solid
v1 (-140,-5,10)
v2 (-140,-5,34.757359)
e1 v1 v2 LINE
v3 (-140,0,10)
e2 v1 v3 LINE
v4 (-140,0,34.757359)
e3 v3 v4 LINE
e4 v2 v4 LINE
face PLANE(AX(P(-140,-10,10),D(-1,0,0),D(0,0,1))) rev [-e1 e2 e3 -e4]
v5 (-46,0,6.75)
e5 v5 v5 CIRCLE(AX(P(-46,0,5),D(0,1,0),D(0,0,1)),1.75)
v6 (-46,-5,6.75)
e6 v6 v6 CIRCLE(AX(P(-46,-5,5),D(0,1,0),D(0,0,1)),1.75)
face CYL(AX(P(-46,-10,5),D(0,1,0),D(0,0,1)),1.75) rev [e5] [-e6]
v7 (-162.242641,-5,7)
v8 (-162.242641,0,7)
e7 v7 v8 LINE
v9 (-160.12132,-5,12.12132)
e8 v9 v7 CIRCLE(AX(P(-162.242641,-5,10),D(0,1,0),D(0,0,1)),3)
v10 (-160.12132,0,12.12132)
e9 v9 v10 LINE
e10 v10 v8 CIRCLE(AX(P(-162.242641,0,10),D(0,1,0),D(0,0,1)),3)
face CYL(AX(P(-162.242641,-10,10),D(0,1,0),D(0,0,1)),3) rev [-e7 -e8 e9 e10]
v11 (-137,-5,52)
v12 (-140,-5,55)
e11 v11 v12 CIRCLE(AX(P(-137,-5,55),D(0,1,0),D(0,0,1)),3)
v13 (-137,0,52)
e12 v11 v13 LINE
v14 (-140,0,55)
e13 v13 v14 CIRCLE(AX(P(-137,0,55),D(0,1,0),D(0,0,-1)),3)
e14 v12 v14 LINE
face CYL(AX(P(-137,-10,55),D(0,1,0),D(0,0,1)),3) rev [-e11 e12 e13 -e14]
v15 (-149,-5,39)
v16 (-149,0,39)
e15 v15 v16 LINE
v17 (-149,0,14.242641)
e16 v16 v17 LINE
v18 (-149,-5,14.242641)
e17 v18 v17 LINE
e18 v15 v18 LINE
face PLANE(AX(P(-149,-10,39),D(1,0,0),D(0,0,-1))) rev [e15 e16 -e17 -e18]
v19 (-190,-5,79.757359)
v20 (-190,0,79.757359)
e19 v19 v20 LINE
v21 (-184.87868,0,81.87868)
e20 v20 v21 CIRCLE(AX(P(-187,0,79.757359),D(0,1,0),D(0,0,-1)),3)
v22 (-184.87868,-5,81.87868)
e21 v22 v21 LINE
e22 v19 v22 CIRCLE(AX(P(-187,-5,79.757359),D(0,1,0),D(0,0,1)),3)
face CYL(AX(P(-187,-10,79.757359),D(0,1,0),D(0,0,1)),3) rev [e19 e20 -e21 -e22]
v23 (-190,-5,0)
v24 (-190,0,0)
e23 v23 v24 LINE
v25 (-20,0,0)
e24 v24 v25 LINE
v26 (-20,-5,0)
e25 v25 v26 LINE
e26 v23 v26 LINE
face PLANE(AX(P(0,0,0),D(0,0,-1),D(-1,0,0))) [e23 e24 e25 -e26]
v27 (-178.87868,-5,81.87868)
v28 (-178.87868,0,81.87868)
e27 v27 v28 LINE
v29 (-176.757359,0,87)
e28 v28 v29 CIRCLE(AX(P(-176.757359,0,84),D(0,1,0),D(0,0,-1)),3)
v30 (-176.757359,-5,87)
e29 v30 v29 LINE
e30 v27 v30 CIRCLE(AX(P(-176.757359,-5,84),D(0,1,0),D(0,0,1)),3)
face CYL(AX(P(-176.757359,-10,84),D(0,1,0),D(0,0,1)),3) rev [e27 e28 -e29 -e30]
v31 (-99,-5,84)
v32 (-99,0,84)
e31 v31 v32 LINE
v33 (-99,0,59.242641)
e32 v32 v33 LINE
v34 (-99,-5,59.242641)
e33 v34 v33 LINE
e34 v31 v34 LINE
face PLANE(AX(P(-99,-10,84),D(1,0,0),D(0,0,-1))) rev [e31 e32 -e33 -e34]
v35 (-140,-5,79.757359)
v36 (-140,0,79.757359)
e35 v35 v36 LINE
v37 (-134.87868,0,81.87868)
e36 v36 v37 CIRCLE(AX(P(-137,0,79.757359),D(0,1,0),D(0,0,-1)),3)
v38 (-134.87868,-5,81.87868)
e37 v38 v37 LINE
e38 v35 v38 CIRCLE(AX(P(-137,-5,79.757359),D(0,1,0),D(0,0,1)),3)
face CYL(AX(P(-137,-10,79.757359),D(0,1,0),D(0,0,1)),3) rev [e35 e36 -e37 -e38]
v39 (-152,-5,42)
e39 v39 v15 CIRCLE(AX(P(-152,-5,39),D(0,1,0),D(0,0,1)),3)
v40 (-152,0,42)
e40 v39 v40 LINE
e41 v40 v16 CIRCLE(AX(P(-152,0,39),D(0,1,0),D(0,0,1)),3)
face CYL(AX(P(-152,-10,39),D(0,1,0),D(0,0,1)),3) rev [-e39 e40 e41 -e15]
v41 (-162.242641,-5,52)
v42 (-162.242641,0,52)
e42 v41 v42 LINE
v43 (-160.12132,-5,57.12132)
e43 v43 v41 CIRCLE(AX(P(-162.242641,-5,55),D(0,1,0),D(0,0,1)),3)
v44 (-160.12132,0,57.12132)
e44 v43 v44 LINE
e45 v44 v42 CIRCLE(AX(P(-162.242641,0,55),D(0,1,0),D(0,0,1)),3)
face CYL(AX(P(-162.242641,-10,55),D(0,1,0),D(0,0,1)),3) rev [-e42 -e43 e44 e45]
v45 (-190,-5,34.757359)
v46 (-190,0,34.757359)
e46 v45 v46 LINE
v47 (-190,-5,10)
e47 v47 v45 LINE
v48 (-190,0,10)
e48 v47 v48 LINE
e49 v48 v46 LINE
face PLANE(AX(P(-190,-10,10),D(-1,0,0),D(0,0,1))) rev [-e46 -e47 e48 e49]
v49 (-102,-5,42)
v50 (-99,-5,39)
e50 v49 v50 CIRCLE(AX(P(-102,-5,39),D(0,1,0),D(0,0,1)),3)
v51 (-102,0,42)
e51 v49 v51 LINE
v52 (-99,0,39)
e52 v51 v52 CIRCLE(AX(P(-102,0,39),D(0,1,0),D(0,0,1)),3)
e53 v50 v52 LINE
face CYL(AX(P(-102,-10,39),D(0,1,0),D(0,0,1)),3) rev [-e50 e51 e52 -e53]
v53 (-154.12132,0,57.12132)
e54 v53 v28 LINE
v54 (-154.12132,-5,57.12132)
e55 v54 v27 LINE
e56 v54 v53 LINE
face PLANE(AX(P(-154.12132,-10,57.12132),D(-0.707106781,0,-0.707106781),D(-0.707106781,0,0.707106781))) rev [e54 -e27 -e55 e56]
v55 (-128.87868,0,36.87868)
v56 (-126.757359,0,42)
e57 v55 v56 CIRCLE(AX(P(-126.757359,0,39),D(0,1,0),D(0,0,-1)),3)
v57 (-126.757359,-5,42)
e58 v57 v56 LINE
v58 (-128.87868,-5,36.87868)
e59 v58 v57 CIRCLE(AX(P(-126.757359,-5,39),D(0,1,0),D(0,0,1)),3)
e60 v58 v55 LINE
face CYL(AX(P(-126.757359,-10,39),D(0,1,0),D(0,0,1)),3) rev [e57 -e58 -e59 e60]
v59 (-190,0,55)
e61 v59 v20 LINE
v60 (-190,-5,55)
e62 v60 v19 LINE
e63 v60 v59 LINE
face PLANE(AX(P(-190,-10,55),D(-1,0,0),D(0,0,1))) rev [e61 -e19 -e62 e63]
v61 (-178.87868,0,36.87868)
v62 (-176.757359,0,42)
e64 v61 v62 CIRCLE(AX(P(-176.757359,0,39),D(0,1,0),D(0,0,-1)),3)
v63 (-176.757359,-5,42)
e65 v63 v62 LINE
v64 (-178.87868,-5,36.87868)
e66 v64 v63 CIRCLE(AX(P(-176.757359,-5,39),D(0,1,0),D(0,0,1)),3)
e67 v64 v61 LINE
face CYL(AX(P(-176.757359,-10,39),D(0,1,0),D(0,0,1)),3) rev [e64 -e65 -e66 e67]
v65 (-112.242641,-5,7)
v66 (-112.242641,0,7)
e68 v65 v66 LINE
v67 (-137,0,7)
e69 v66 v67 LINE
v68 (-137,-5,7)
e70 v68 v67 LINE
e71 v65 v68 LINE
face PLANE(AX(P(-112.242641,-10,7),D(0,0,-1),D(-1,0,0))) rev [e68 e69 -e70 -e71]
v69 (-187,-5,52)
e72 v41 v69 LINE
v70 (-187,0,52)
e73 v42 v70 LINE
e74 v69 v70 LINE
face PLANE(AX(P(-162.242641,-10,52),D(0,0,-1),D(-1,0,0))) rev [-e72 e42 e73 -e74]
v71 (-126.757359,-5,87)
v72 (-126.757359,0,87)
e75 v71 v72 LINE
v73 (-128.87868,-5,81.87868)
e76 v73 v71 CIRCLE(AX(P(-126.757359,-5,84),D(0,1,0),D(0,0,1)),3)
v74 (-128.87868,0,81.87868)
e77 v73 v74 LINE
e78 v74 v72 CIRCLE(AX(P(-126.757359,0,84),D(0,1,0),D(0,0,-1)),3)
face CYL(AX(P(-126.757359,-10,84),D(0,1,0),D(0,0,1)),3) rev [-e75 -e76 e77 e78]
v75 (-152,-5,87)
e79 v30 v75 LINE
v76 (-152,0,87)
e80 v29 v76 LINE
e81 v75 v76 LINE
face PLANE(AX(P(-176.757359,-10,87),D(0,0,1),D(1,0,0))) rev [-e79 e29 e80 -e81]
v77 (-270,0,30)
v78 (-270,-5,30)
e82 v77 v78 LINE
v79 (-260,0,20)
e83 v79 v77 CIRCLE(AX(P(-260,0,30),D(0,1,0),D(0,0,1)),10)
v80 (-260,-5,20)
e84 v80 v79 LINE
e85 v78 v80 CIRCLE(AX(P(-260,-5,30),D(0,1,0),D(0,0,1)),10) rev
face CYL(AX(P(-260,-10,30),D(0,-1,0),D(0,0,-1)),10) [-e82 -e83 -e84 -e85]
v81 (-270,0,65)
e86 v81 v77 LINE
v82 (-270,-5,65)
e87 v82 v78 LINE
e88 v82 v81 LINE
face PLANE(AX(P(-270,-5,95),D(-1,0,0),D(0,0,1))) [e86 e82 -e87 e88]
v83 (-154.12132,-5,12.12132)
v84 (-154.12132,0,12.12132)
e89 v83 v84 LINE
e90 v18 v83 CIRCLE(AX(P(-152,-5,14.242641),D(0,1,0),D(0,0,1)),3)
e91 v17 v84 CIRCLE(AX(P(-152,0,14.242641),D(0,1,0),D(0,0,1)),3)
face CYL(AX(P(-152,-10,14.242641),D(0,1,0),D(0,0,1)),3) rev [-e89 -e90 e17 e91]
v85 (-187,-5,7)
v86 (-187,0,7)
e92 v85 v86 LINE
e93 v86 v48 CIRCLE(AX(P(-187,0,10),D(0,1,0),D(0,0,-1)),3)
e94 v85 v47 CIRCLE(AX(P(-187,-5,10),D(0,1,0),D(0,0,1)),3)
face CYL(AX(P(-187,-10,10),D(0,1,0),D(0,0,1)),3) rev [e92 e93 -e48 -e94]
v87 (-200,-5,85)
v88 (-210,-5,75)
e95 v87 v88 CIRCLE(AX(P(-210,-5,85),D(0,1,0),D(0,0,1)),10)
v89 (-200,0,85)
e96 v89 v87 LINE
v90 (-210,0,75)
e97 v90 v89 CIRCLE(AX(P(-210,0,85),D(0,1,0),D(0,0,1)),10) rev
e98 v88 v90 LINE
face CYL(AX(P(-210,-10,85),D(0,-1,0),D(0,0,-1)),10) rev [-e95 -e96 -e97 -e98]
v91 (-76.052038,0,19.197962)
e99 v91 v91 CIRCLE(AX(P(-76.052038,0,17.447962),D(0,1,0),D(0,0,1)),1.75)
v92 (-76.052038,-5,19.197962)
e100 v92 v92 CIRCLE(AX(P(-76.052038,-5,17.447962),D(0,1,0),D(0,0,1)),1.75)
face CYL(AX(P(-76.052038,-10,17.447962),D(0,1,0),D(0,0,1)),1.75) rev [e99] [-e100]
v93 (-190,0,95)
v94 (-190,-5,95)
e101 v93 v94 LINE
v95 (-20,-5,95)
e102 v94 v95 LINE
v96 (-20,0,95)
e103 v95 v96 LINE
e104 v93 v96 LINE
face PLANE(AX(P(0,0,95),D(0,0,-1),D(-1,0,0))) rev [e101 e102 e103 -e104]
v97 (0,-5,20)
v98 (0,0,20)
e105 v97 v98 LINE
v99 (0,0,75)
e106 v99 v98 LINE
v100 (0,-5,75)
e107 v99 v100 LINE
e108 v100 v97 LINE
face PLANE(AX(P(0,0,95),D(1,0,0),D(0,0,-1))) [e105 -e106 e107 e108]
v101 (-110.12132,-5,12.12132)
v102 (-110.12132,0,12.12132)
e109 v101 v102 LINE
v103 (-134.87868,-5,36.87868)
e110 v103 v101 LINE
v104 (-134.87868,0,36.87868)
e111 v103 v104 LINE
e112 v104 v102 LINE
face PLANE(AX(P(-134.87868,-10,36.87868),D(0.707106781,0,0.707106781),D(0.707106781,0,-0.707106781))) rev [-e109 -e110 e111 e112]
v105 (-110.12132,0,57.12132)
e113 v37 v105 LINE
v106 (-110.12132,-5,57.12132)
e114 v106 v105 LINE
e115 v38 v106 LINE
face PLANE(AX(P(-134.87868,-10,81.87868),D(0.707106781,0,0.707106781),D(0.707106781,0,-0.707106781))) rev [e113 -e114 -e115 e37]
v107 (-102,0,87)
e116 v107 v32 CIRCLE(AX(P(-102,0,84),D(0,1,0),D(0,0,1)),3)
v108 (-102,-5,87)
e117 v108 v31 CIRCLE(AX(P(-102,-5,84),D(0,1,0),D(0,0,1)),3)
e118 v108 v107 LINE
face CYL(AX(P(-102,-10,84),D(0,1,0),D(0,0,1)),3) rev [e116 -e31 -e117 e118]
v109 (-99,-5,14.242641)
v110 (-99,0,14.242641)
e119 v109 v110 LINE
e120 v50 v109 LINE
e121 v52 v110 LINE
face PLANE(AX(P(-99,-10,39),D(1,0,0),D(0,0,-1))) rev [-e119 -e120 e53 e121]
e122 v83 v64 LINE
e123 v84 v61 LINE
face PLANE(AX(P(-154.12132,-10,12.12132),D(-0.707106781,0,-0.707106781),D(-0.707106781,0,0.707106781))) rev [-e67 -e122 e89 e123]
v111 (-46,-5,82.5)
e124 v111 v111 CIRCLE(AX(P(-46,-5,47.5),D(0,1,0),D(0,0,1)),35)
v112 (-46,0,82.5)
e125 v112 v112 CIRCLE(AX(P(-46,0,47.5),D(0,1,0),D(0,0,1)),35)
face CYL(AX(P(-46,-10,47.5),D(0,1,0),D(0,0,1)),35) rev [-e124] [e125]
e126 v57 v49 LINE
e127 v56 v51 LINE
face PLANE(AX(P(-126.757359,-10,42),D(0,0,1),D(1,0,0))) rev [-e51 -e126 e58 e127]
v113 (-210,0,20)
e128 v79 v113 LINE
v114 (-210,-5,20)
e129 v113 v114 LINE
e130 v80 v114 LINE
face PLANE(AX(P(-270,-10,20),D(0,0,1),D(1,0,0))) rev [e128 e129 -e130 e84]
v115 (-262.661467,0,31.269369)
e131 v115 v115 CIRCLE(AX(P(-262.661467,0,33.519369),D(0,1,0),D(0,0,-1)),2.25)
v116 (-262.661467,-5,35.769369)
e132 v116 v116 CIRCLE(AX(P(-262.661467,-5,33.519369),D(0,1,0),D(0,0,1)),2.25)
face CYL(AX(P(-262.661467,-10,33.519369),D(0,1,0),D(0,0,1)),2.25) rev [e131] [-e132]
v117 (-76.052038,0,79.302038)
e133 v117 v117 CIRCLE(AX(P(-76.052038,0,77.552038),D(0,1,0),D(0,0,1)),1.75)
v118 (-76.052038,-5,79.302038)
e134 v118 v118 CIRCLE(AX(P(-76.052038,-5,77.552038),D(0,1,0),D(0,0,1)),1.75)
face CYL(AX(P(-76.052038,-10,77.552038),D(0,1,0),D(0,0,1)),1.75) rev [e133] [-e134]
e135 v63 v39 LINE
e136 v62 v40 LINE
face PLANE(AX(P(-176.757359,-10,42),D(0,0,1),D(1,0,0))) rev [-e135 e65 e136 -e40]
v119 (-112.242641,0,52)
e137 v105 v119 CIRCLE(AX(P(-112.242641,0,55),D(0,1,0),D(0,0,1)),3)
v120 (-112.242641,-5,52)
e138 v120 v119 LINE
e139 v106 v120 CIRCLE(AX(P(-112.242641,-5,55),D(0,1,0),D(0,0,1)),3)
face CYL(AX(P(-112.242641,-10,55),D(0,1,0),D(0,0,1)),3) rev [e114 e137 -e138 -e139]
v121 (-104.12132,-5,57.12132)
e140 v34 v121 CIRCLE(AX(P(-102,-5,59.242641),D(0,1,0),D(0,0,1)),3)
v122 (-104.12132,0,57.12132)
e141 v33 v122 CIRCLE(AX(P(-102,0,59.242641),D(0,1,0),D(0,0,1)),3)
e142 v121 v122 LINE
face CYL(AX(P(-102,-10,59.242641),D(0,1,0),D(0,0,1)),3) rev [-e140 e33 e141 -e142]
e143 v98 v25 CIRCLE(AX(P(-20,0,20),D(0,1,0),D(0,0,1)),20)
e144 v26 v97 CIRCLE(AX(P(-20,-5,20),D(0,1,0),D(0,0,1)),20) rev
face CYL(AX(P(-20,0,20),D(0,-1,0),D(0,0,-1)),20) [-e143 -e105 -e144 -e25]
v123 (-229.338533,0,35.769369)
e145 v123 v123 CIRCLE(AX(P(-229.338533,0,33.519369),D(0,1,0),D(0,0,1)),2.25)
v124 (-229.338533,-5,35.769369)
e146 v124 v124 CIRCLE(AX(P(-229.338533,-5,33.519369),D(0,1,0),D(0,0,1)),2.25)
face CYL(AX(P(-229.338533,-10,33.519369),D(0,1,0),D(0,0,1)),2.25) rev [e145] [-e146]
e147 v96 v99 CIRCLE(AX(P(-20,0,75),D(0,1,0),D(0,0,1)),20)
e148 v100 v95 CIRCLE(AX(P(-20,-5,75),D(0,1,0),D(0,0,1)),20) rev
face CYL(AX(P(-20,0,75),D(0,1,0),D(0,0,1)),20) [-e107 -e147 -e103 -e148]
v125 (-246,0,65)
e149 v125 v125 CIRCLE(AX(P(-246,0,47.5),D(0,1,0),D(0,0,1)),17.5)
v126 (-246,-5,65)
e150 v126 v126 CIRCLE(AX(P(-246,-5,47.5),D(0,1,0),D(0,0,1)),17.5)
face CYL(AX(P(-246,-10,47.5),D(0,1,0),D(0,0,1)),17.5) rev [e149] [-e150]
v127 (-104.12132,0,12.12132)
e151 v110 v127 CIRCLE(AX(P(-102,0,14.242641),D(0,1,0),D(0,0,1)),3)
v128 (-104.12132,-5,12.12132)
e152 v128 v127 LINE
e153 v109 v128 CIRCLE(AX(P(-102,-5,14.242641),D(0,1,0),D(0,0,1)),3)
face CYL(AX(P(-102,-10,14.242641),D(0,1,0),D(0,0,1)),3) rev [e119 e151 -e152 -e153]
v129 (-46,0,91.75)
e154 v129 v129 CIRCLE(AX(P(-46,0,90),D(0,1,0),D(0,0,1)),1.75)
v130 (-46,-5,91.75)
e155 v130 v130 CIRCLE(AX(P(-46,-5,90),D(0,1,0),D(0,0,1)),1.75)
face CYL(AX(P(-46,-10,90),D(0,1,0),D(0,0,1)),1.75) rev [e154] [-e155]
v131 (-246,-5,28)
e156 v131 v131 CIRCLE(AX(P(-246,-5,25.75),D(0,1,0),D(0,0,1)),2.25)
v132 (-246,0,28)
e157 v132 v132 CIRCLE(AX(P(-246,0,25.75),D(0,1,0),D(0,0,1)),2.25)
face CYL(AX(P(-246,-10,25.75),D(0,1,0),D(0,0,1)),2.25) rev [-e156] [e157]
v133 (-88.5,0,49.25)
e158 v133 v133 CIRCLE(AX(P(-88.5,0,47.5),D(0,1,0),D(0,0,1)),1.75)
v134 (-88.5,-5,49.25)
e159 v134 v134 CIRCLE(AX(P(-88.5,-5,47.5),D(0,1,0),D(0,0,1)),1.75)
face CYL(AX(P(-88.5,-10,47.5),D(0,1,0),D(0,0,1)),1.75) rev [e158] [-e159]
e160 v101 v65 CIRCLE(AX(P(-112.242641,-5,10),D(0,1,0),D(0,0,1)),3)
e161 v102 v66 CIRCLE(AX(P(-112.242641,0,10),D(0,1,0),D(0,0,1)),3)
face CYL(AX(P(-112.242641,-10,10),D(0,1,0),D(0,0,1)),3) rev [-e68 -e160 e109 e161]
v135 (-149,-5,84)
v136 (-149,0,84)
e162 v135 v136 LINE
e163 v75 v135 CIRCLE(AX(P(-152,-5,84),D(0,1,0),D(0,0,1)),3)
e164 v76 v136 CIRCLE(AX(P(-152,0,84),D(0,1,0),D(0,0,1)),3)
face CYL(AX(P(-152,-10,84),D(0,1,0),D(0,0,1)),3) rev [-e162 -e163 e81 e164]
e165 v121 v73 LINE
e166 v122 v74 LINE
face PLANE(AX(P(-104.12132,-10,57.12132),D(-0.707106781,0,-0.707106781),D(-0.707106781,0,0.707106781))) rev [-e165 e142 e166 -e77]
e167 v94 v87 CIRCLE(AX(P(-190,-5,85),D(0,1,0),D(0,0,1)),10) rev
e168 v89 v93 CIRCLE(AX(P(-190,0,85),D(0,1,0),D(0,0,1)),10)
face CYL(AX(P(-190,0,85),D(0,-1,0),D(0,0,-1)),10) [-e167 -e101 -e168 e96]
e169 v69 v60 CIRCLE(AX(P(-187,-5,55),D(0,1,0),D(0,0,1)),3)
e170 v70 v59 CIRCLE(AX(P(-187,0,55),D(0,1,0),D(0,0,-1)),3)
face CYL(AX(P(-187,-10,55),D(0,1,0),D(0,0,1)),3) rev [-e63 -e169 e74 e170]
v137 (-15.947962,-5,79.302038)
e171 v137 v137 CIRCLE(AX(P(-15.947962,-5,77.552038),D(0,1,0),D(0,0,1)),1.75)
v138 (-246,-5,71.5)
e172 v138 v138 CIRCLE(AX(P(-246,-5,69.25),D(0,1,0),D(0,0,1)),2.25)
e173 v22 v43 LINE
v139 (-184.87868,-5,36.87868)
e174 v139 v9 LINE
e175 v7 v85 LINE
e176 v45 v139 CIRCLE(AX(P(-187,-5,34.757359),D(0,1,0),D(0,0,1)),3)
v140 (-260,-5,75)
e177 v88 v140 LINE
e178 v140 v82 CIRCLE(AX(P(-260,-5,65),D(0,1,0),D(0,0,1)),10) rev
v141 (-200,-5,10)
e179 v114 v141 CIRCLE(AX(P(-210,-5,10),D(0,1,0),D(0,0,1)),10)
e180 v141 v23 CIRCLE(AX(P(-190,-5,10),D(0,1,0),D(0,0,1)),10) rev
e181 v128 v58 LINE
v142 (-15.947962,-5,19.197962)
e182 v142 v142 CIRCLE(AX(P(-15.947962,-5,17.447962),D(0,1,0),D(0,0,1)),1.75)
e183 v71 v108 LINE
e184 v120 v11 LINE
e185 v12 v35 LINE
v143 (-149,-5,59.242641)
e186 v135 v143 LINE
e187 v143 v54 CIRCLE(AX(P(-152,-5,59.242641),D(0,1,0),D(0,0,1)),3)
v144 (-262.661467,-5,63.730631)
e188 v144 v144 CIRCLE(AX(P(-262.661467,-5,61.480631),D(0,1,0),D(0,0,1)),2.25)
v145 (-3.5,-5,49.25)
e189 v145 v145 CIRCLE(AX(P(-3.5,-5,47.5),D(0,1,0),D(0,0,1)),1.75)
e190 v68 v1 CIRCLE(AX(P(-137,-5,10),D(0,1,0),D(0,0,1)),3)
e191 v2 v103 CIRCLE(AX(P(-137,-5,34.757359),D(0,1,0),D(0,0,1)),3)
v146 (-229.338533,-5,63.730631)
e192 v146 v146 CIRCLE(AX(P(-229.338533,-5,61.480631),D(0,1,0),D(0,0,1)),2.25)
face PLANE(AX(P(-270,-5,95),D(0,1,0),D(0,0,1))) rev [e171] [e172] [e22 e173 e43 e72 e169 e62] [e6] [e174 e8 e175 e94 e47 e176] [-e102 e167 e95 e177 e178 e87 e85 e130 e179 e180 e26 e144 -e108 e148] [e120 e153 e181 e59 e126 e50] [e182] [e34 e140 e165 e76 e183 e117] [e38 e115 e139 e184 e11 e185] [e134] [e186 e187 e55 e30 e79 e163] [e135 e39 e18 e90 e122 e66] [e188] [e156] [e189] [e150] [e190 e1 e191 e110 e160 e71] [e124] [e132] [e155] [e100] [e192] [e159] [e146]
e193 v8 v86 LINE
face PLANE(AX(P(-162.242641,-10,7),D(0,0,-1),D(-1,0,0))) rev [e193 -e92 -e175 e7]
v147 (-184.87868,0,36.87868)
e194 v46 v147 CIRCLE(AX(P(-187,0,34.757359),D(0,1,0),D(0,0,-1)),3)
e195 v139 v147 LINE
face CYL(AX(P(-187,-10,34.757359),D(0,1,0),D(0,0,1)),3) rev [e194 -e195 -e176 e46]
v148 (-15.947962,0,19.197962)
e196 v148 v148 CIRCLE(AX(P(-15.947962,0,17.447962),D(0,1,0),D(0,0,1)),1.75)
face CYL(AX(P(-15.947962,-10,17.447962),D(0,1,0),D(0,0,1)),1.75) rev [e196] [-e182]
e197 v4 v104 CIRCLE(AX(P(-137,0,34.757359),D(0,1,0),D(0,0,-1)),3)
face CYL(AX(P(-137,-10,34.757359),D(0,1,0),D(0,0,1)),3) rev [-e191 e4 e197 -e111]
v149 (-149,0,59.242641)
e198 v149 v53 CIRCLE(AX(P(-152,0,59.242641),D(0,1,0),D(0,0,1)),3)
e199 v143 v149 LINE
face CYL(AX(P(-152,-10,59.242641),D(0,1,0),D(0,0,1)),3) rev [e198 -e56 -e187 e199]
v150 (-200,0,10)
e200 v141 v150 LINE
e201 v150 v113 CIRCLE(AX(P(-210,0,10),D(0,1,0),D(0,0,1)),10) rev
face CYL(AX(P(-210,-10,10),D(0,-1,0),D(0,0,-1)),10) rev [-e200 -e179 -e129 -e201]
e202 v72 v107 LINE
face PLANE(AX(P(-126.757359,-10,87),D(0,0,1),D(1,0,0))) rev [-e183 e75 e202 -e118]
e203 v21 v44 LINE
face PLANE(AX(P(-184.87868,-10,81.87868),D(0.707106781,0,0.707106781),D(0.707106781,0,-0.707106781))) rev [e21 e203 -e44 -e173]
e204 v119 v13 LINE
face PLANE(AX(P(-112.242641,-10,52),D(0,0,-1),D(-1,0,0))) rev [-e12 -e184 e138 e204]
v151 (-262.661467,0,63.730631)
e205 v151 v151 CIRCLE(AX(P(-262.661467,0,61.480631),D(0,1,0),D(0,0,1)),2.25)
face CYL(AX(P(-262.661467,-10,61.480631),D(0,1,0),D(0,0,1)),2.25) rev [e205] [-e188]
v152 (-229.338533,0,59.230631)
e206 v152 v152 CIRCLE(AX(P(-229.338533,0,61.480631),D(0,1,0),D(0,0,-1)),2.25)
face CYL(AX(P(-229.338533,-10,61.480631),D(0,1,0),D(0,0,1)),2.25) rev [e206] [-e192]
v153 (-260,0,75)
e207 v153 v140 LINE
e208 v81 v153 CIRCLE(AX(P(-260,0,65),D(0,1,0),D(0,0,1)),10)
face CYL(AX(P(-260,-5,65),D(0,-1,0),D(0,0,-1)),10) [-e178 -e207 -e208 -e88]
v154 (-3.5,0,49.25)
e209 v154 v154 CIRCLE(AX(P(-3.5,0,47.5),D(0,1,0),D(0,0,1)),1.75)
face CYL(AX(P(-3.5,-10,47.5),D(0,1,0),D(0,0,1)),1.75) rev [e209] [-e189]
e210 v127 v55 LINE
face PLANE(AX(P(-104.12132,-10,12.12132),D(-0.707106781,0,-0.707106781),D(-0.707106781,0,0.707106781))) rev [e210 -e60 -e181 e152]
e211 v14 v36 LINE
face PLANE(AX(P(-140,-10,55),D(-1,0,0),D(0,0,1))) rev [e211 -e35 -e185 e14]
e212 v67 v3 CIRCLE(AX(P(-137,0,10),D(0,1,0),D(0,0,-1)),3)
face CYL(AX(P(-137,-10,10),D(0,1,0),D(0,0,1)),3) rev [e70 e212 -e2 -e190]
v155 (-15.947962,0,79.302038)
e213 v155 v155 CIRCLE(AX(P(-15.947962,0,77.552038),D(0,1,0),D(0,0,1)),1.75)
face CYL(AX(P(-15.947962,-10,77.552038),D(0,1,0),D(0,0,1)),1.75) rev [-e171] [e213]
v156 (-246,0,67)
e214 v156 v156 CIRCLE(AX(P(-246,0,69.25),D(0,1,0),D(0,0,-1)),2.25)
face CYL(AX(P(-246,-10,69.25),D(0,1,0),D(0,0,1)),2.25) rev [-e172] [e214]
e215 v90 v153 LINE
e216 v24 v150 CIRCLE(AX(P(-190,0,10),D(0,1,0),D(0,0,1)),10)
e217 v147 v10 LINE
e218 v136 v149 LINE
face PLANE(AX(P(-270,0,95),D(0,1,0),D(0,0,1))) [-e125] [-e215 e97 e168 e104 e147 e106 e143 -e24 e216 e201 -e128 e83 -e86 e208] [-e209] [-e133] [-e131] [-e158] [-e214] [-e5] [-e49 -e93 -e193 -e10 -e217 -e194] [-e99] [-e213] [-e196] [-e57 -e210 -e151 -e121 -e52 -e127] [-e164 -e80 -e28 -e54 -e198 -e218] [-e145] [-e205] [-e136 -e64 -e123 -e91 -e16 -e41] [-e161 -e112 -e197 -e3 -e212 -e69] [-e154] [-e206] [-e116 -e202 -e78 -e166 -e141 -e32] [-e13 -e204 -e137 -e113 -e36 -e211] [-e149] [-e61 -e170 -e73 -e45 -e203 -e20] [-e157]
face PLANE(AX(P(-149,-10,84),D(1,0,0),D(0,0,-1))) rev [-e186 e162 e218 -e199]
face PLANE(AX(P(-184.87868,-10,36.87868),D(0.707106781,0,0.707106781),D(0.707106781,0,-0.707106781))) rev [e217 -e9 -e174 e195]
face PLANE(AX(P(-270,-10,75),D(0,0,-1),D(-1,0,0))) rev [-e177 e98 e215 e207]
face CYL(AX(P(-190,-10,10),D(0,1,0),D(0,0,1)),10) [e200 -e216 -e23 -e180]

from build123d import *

# Parameters (mm, degrees)
SKETCH_1_W          = 270
SKETCH_1_H          = 5
EXTRUDE_1_DEPTH     = 95
SKETCH_2_R          = 2.25
SKETCH_2_R_2        = 1.75
SKETCH_2_R_3        = 17.5
SKETCH_2_R_4        = 35
CUT_EXTRUDE_1_DEPTH = 10
SKETCH_3_W          = 70
SKETCH_3_H          = 20
CUT_EXTRUDE_2_DEPTH = 10
FILLET_1_R          = 10
FILLET_2_R          = 20


with BuildPart() as part:
    # 草图1 → 拉伸-薄壁1 (new body)
    with BuildSketch(Plane.XY):
        with Locations((-135, -2.5)):
            Rectangle(SKETCH_1_W, SKETCH_1_H)
    extrude(amount=EXTRUDE_1_DEPTH)

    # 草图2 → 切除-拉伸1 (cut)
    with BuildSketch(Plane(origin=(0, 0, 0), x_dir=(1, 0, 0), z_dir=(0, 1, 0))):
        with Locations(Location((-246, -25.75, 0), (0, 0, 270))):
            Circle(SKETCH_2_R)
        with Locations(Location((-229.338533362, -33.519369489, 0), (0, 0, 270))):
            Circle(SKETCH_2_R)
        with Locations(Location((-262.661466638, -33.519369489, 0), (0, 0, 270))):
            Circle(SKETCH_2_R)
        with Locations(Location((-262.661466638, -61.480630511, 0), (0, 0, 270))):
            Circle(SKETCH_2_R)
        with Locations(Location((-246, -69.25, 0), (0, 0, 270))):
            Circle(SKETCH_2_R)
        with Locations(Location((-229.338533362, -61.480630511, 0), (0, 0, 270))):
            Circle(SKETCH_2_R)
        with Locations(Location((-3.5, -47.5, 0), (0, 0, 270))):
            Circle(SKETCH_2_R_2)
        with Locations(Location((-15.9479618, -77.5520382, 0), (0, 0, 270))):
            Circle(SKETCH_2_R_2)
        with Locations(Location((-46, -90, 0), (0, 0, 270))):
            Circle(SKETCH_2_R_2)
        with Locations(Location((-76.0520382, -77.5520382, 0), (0, 0, 270))):
            Circle(SKETCH_2_R_2)
        with Locations(Location((-88.5, -47.5, 0), (0, 0, 270))):
            Circle(SKETCH_2_R_2)
        with Locations(Location((-76.0520382, -17.4479618, 0), (0, 0, 270))):
            Circle(SKETCH_2_R_2)
        with Locations(Location((-46, -5, 0), (0, 0, 270))):
            Circle(SKETCH_2_R_2)
        with Locations(Location((-15.9479618, -17.4479618, 0), (0, 0, 270))):
            Circle(SKETCH_2_R_2)
        with Locations(Location((-246, -47.5, 0), (0, 0, 270))):
            Circle(SKETCH_2_R_3)
        with Locations(Location((-46, -47.5, 0), (0, 0, 270))):
            Circle(SKETCH_2_R_4)
    extrude(amount=-CUT_EXTRUDE_1_DEPTH, mode=Mode.SUBTRACT)

    # 草图3 → 切除-拉伸2 (cut)
    with BuildSketch(Plane(origin=(0, 0, 0), x_dir=(1, 0, 0), z_dir=(0, 1, 0))):
        with Locations((-235, -85)):
            Rectangle(SKETCH_3_W, SKETCH_3_H)
        with Locations((-235, -10)):
            Rectangle(SKETCH_3_W, SKETCH_3_H)
        with BuildLine():
            Line((-190, -10), (-190, -34.757359313))
            ThreePointArc((-190, -34.757359313), (-188.148050297, -37.52899791), (-184.878679656, -36.878679656))
            Line((-184.878679656, -36.878679656), (-160.121320344, -12.121320344))
            ThreePointArc((-160.121320344, -12.121320344), (-159.47100209, -8.851949703), (-162.242640687, -7))
            Line((-162.242640687, -7), (-187, -7))
            ThreePointArc((-187, -7), (-189.121320344, -7.878679656), (-190, -10))
        make_face()
        with BuildLine():
            Line((-154.121320344, -12.121320344), (-178.878679656, -36.878679656))
            ThreePointArc((-178.878679656, -36.878679656), (-179.52899791, -40.148050297), (-176.757359313, -42))
            Line((-176.757359313, -42), (-152, -42))
            ThreePointArc((-152, -42), (-149.878679656, -41.121320344), (-149, -39))
            Line((-149, -39), (-149, -14.242640687))
            ThreePointArc((-149, -14.242640687), (-150.851949703, -11.47100209), (-154.121320344, -12.121320344))
        make_face()
        with BuildLine():
            Line((-112.242640687, -7), (-137, -7))
            ThreePointArc((-137, -7), (-139.121320344, -7.878679656), (-140, -10))
            Line((-140, -10), (-140, -34.757359313))
            ThreePointArc((-140, -34.757359313), (-138.148050297, -37.52899791), (-134.878679656, -36.878679656))
            Line((-134.878679656, -36.878679656), (-110.121320344, -12.121320344))
            ThreePointArc((-110.121320344, -12.121320344), (-109.47100209, -8.851949703), (-112.242640687, -7))
        make_face()
        with BuildLine():
            Line((-99, -39), (-99, -14.242640687))
            ThreePointArc((-99, -14.242640687), (-100.851949703, -11.47100209), (-104.121320344, -12.121320344))
            Line((-104.121320344, -12.121320344), (-128.878679656, -36.878679656))
            ThreePointArc((-128.878679656, -36.878679656), (-129.52899791, -40.148050297), (-126.757359313, -42))
            Line((-126.757359313, -42), (-102, -42))
            ThreePointArc((-102, -42), (-99.878679656, -41.121320344), (-99, -39))
        make_face()
        with BuildLine():
            Line((-112.242640687, -52), (-137, -52))
            ThreePointArc((-137, -52), (-139.121320344, -52.878679656), (-140, -55))
            Line((-140, -55), (-140, -79.757359313))
            ThreePointArc((-140, -79.757359313), (-138.148050297, -82.52899791), (-134.878679656, -81.878679656))
            Line((-134.878679656, -81.878679656), (-110.121320344, -57.121320344))
            ThreePointArc((-110.121320344, -57.121320344), (-109.47100209, -53.851949703), (-112.242640687, -52))
        make_face()
        with BuildLine():
            Line((-99, -84), (-99, -59.242640687))
            ThreePointArc((-99, -59.242640687), (-100.851949703, -56.47100209), (-104.121320344, -57.121320344))
            Line((-104.121320344, -57.121320344), (-128.878679656, -81.878679656))
            ThreePointArc((-128.878679656, -81.878679656), (-129.52899791, -85.148050297), (-126.757359313, -87))
            Line((-126.757359313, -87), (-102, -87))
            ThreePointArc((-102, -87), (-99.878679656, -86.121320344), (-99, -84))
        make_face()
        with BuildLine():
            Line((-162.242640687, -52), (-187, -52))
            ThreePointArc((-187, -52), (-189.121320344, -52.878679656), (-190, -55))
            Line((-190, -55), (-190, -79.757359313))
            ThreePointArc((-190, -79.757359313), (-188.148050297, -82.52899791), (-184.878679656, -81.878679656))
            Line((-184.878679656, -81.878679656), (-160.121320344, -57.121320344))
            ThreePointArc((-160.121320344, -57.121320344), (-159.47100209, -53.851949703), (-162.242640687, -52))
        make_face()
        with BuildLine():
            Line((-149, -84), (-149, -59.242640687))
            ThreePointArc((-149, -59.242640687), (-150.851949703, -56.47100209), (-154.121320344, -57.121320344))
            Line((-154.121320344, -57.121320344), (-178.878679656, -81.878679656))
            ThreePointArc((-178.878679656, -81.878679656), (-179.52899791, -85.148050297), (-176.757359313, -87))
            Line((-176.757359313, -87), (-152, -87))
            ThreePointArc((-152, -87), (-149.878679656, -86.121320344), (-149, -84))
        make_face()
    extrude(amount=-CUT_EXTRUDE_2_DEPTH, mode=Mode.SUBTRACT)

    # 圆角1
    fillet_1_edges = [part.edges().sort_by_distance(p)[0] for p in [
        (-200, -2.5, 95),
        (-200, -2.5, 0),
        (-200, -2.5, 20),
        (-200, -2.5, 75),
        (-270, -2.5, 75),
        (-270, -2.5, 20),
    ]]
    fillet(fillet_1_edges, radius=FILLET_1_R - 0.0001)  # a hair under: the kernel refuses the full size

    # 圆角2
    fillet_2_edges = [part.edges().sort_by_distance(p)[0] for p in [
        (0, -2.5, 0),
        (0, -2.5, 95),
    ]]
    fillet(fillet_2_edges, radius=FILLET_2_R)


solid = part.part
